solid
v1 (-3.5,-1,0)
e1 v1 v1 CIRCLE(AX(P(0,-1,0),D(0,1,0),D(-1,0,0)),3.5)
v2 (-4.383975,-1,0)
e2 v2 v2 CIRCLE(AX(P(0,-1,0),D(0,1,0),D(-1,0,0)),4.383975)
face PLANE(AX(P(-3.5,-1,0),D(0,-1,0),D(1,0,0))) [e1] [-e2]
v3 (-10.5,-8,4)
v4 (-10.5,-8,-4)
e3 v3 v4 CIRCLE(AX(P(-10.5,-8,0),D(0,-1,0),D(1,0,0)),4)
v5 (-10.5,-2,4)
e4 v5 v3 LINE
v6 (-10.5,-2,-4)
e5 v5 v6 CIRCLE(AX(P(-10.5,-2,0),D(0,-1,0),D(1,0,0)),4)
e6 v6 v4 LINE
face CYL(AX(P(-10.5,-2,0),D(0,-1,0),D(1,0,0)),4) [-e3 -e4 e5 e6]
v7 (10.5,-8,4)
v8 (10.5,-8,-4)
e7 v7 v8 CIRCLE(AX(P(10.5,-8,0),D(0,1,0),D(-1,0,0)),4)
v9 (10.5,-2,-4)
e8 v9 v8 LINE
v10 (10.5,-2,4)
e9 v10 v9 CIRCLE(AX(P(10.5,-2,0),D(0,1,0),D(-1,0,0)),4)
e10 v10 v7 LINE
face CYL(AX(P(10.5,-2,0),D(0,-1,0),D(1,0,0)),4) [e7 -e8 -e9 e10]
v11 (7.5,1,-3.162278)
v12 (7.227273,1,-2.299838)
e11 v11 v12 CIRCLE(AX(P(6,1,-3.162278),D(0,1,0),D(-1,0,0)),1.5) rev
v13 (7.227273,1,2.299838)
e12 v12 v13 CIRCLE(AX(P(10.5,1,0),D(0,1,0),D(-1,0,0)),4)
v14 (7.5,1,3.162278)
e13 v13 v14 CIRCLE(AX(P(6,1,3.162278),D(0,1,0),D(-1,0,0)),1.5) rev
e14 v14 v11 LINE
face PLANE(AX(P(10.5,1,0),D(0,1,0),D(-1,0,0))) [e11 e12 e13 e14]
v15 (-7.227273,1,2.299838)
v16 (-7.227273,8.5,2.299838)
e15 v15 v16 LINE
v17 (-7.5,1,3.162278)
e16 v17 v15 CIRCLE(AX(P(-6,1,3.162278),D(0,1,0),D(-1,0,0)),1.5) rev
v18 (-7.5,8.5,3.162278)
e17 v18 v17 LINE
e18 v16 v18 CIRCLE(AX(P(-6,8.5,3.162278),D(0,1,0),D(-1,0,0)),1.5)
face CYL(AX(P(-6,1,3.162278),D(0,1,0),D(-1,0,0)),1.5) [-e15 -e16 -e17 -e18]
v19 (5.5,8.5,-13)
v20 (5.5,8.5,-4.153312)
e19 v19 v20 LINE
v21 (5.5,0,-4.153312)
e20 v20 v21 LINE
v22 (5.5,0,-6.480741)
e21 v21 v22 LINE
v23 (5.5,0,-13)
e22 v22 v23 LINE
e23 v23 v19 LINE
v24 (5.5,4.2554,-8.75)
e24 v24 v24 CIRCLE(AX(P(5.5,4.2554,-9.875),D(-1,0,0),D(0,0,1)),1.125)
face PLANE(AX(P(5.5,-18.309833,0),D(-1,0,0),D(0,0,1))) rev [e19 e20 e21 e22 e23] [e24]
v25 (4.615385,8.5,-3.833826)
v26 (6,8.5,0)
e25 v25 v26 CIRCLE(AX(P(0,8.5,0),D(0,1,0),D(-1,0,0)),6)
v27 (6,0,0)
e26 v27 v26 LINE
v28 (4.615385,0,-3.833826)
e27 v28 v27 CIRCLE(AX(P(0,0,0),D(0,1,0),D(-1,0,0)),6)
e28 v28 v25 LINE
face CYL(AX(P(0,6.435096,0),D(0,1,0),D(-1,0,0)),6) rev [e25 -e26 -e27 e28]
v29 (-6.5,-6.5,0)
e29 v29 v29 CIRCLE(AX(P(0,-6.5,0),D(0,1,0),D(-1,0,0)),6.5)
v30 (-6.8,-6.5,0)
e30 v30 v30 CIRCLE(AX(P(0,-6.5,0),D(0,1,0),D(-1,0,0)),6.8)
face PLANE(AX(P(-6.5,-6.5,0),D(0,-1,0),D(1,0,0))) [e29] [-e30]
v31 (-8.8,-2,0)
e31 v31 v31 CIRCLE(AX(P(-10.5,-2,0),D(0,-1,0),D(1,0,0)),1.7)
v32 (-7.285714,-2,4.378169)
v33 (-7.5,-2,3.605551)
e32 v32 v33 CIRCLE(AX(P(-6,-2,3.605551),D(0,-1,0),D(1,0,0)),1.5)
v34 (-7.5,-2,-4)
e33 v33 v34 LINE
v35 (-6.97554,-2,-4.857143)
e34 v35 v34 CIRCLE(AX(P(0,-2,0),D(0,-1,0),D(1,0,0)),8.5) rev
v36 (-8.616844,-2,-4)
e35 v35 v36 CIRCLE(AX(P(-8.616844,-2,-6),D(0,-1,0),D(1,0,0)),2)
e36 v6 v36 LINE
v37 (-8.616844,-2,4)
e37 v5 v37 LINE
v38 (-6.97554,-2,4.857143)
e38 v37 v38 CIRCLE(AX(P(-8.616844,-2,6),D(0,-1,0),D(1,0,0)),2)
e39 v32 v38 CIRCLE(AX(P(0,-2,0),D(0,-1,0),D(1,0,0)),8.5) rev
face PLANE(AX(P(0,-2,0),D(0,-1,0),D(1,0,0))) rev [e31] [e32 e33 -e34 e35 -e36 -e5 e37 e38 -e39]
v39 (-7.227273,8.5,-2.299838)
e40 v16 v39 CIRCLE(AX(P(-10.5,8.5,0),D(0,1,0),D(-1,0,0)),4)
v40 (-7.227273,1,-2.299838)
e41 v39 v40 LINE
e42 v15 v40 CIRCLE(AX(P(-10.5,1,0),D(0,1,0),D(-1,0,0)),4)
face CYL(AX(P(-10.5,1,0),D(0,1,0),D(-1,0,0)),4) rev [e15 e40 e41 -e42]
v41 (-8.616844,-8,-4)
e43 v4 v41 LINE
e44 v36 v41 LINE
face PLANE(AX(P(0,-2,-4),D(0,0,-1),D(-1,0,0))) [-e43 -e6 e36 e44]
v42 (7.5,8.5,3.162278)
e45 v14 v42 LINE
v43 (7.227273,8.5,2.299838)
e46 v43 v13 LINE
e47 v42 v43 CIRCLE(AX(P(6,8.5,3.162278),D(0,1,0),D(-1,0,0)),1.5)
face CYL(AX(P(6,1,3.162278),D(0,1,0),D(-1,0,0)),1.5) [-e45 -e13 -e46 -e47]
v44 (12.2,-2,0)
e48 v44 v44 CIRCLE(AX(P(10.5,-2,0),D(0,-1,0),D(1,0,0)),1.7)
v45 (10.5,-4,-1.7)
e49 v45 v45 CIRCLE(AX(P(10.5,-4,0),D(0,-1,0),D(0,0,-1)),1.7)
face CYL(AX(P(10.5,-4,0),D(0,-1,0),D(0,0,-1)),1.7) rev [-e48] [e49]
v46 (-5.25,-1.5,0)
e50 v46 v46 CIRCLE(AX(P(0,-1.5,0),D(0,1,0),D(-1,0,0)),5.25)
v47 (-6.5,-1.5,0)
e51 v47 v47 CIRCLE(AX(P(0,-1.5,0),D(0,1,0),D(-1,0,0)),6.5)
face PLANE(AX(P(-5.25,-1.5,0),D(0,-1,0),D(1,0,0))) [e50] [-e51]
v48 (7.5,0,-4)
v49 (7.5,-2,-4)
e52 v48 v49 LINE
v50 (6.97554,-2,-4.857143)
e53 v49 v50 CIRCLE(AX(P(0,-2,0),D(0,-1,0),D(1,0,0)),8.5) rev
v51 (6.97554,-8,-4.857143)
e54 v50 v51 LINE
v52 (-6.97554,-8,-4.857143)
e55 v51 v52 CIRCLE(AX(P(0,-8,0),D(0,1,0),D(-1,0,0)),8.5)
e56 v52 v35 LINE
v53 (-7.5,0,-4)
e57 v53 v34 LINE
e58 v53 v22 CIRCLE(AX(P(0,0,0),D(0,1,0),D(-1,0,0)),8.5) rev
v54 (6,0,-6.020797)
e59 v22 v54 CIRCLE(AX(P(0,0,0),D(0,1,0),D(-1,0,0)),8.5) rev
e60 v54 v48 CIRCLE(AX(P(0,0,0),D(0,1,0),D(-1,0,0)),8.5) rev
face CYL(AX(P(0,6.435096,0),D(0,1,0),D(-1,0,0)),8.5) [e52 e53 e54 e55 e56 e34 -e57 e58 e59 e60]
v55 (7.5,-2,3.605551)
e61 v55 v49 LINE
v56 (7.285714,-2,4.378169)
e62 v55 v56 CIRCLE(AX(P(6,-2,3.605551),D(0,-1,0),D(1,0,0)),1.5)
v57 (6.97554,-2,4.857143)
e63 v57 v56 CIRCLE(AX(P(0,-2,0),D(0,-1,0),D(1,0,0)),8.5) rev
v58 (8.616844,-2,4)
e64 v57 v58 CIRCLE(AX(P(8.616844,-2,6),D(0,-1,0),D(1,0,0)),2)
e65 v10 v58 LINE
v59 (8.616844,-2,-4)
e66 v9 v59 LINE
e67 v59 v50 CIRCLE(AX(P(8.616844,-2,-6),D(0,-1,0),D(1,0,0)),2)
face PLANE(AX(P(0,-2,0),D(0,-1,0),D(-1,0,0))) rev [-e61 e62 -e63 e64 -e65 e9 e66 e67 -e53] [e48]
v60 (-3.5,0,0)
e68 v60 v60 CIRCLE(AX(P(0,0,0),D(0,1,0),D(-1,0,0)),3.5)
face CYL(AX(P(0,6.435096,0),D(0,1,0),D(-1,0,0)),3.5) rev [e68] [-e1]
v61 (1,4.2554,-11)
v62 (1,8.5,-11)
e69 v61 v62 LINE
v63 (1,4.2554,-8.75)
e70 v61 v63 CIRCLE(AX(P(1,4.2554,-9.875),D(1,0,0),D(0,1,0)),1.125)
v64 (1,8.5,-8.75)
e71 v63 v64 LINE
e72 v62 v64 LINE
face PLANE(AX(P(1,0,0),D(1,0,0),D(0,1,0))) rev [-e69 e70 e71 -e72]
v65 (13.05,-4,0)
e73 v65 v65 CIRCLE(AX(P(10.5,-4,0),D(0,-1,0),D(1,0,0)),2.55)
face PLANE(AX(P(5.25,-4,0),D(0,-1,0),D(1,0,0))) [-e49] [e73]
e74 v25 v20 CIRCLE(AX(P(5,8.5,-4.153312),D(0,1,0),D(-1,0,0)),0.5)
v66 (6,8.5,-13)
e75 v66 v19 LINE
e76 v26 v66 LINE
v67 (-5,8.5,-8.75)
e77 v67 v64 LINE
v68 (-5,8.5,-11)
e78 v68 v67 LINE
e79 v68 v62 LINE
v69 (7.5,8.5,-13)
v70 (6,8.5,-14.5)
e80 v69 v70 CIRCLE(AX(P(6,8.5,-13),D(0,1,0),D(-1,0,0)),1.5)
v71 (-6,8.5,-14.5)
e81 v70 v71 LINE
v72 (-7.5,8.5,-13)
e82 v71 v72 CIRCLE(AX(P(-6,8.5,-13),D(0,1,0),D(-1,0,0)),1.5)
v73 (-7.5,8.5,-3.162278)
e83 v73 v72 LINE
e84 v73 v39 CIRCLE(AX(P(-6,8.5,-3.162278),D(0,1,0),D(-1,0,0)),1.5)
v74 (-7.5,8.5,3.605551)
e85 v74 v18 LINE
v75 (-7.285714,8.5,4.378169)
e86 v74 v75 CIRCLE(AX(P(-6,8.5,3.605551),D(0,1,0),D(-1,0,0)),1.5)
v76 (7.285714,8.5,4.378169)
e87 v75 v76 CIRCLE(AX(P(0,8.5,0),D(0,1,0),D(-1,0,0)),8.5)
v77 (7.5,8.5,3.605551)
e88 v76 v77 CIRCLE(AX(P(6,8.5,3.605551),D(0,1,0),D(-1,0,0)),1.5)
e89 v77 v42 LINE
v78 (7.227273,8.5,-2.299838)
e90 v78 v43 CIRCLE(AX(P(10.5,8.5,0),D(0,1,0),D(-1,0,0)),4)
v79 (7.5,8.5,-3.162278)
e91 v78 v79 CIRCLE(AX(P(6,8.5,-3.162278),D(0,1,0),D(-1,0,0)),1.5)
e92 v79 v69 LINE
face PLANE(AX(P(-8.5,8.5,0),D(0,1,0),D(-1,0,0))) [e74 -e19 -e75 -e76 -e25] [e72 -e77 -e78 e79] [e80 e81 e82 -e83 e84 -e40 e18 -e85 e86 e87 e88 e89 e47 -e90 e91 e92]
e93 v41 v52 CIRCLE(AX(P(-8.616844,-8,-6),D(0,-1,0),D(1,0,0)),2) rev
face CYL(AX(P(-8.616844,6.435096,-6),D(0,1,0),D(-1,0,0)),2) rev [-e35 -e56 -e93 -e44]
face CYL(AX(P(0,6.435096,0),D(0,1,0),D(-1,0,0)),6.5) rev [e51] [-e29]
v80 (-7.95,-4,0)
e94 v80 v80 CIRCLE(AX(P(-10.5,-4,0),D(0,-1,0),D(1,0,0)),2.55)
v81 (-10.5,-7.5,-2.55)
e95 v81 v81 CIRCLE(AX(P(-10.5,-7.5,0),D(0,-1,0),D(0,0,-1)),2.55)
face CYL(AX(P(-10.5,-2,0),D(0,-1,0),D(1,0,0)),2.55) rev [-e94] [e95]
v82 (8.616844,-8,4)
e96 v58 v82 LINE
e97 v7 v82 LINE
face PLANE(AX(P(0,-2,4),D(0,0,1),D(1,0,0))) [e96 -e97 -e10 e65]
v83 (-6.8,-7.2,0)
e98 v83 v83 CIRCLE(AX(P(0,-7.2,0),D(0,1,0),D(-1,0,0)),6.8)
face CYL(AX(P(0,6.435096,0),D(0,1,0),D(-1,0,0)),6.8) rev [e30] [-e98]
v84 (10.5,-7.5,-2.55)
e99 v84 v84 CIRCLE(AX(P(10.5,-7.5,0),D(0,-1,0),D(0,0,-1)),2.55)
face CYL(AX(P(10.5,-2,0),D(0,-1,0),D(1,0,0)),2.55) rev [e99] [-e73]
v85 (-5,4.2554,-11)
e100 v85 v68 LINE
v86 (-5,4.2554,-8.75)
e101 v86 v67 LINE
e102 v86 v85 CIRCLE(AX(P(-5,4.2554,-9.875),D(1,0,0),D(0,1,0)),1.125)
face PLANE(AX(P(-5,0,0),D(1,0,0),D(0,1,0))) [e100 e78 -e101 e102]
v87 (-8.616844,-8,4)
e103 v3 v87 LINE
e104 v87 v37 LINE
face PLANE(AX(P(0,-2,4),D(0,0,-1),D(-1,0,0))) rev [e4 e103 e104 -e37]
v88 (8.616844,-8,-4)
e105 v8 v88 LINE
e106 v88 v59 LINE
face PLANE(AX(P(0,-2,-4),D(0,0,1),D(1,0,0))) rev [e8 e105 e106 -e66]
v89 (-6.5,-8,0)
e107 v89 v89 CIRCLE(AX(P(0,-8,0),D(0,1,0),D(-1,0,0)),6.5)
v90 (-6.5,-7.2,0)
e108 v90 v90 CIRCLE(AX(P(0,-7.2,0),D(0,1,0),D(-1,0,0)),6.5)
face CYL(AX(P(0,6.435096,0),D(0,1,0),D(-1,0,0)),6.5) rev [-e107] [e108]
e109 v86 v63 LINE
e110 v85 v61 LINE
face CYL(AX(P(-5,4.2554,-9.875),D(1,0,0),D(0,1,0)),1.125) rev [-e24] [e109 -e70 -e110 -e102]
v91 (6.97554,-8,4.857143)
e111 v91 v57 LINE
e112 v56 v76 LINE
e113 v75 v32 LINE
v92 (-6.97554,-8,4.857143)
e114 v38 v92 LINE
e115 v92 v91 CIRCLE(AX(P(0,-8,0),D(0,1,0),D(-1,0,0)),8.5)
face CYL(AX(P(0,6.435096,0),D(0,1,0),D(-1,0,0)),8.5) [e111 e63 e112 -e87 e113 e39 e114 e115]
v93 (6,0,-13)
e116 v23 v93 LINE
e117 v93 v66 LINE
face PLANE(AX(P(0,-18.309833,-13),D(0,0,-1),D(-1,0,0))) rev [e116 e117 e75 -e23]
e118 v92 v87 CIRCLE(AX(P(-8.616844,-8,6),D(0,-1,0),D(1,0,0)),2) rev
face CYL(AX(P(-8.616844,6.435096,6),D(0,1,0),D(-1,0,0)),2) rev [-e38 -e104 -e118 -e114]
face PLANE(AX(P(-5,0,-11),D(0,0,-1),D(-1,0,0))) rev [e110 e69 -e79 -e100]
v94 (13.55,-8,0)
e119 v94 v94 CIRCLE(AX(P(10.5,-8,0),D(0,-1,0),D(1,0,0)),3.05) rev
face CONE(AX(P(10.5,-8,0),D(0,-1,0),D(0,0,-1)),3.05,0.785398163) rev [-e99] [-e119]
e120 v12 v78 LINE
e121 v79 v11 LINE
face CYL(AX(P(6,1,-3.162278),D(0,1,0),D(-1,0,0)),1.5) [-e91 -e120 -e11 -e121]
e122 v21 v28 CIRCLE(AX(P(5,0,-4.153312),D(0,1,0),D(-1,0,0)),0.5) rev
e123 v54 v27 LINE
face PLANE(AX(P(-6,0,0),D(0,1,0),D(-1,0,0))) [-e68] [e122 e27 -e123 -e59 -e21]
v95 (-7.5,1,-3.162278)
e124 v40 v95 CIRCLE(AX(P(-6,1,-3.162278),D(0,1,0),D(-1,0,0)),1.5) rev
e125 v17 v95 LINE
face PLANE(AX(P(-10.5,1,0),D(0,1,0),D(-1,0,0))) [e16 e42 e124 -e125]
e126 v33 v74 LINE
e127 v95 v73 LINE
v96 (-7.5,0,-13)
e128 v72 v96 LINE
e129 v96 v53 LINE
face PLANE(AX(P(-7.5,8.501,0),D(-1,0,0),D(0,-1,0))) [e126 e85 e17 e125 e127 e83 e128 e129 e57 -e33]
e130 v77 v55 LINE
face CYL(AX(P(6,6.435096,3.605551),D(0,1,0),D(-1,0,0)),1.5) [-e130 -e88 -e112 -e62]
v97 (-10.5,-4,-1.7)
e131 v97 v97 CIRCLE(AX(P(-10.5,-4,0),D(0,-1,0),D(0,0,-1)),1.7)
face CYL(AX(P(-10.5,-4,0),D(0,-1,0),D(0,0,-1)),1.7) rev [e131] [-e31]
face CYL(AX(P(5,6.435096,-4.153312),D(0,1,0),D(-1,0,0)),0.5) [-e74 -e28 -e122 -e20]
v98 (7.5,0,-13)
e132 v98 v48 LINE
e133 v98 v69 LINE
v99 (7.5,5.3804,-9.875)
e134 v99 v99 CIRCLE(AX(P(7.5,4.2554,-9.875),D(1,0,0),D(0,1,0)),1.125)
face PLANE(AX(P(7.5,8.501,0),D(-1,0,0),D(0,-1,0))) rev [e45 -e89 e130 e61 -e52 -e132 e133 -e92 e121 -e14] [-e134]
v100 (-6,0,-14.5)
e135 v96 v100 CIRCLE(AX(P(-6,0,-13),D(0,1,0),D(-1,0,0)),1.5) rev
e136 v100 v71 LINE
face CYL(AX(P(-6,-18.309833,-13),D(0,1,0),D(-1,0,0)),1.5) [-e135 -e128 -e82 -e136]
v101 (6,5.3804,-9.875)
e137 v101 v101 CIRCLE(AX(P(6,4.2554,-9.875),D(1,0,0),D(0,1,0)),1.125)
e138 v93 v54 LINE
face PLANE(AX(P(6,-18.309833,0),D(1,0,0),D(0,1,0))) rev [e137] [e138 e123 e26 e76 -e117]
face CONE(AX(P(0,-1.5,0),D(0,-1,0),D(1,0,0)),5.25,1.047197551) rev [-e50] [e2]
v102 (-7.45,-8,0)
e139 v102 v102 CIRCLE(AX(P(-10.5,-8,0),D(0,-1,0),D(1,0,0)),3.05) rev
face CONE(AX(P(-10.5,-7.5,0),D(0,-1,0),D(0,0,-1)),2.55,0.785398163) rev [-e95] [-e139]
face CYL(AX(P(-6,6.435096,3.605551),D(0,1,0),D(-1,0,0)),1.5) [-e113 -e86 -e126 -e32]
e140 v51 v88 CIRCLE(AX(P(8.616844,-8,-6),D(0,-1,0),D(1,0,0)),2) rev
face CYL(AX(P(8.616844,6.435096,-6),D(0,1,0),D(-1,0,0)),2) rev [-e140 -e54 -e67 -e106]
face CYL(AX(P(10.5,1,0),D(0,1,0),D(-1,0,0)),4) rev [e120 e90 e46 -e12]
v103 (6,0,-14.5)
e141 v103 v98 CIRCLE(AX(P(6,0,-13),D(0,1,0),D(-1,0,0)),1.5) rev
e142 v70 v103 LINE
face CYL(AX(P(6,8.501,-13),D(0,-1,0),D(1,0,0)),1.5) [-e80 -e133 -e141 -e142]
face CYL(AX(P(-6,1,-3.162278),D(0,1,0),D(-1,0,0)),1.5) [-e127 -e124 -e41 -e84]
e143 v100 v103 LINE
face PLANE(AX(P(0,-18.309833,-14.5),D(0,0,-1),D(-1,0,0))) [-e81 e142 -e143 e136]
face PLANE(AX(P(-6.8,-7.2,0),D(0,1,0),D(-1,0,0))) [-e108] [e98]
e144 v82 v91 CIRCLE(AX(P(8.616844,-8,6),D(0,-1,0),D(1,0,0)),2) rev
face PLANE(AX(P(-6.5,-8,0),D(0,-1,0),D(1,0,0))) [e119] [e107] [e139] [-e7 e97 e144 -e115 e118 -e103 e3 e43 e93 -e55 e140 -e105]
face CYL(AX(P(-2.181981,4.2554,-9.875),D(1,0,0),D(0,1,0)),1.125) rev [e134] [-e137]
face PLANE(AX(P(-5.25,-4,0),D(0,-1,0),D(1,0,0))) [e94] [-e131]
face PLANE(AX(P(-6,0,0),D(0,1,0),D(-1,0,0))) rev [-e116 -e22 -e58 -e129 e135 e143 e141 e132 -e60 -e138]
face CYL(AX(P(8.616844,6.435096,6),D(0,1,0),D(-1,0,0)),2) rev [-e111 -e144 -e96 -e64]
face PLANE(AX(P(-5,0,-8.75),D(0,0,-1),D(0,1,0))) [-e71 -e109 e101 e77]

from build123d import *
from build123d.topology import SkipClean

# Parameters (mm, degrees)
BOSS_EXTRU_1_START      = -6
BOSS_EXTRU_1_DEPTH      = 6
BOSS_EXTRU_2_START      = -6
BOSS_EXTRU_2_DEPTH      = 2
ENL_V_START             = -4
ESQUISSE3_5_R           = 2.55
ENL_V_MAT_EXTRU_1_DEPTH = 4
ENL_V_START_2           = -16.5
ENL_V_MAT_EXTRU_5_DEPTH = 10.5
CONG_1_R                = 2
CHANFREIN1_SIZE         = 0.5
SYM_TRIE1_START         = -2
SYM_TRIE1_DEPTH         = 10.5
SYM_TRIE1_START_2       = -8
SYM_TRIE1_2_DEPTH       = 4
SYM_TRIE1_START_3       = -7.5000001
SYM_TRIE1_3_DEPTH       = 5.5000001
SYM_TRIE1_START_4       = -4
SYM_TRIE1_4_DEPTH       = 2
SYM_TRIE1_7_DEPTH       = 0.4999999
M3_CLEARANCE_HOLE1_D    = 3.4
BOSS_EXTRU_3_DEPTH      = 8.5
ENL_V_START_3           = -8.5
ENL_V_MAT_EXTRU_2_DEPTH = 8.5
ENL_V_START_4           = -6.5
ESQUISSE5_R             = 1.125
ENL_V_MAT_EXTRU_3_DEPTH = 6
ESQUISSE5_3_R           = 1.125
ENL_V_MAT_EXTRU_4_DEPTH = 6.5
CONG_2_R                = 0.5
CONG_3_R                = 1.5
ENL_V_START_5           = -7.5
ESQUISSE9_R             = 4
ENL_V_MAT_EXTRU_8_DEPTH = 7.5
CONG_5_R                = 1.5


with BuildPart() as part:
    # Esquisse1 → Révolution1 (revolve)
    with BuildSketch(Plane.XY):
        Polygon((-8.5, 8.5), (-6, 8.5), (-6, 0), (-3.5, 0), (-3.5, -1), (-4.383974596, -1), (-5.25, -1.5), (-6.5, -1.5), (-6.5, -6.5), (-6.8, -6.5), (-6.8, -7.2), (-6.5, -7.2), (-6.5, -8), (-8.5, -8), align=None)
    revolve(axis=Axis((0, 6.43509573, 0), (0, -1, 0)))

    # Esquisse3 → Boss.-Extru.1 (add)
    with BuildSketch(Plane.XZ.offset(8).offset(BOSS_EXTRU_1_START)):
        with BuildLine():
            ThreePointArc((-7.928571429, 3.06394437), (-7.728470361, 3.5384666), (-7.5, 4))
            Line((-7.5, 4), (-10.5, 4))
            ThreePointArc((-10.5, 4), (-14.5, 0), (-10.5, -4))
            Line((-10.5, -4), (-7.5, -4))
            ThreePointArc((-7.5, -4), (-7.728470361, -3.5384666), (-7.928571429, -3.06394437))
            ThreePointArc((-7.928571429, -3.06394437), (-8.196108254, -2.252511816), (-8.380833333, -1.418320358))
            ThreePointArc((-8.380833333, -1.418320358), (-13.05, 0), (-8.380833333, 1.418320358))
            ThreePointArc((-8.380833333, 1.418320358), (-8.196108254, 2.252511816), (-7.928571429, 3.06394437))
        make_face()
    extrude(amount=BOSS_EXTRU_1_DEPTH)

    # Esquisse3<4> → Boss.-Extru.2 (add)
    with BuildSketch(Plane.XZ.offset(8).offset(BOSS_EXTRU_2_START)):
        with BuildLine():
            ThreePointArc((-8.380833333, -1.418320358), (-8.5, 0), (-8.380833333, 1.418320358))
            ThreePointArc((-8.380833333, 1.418320358), (-13.05, 0), (-8.380833333, -1.418320358))
        make_face()
    extrude(amount=BOSS_EXTRU_2_DEPTH)

    # Esquisse3<5> → Enlèv. mat.-Extru.1 (cut)
    with BuildSketch(Plane.XZ.offset(8).offset(ENL_V_START)):
        with Locations((-10.5, 0)):
            Circle(ESQUISSE3_5_R)
    extrude(amount=ENL_V_MAT_EXTRU_1_DEPTH, mode=Mode.SUBTRACT)

    # Esquisse3<7> → Enlèv. mat.-Extru.5 (cut)
    with BuildSketch(Plane.XZ.offset(8).offset(ENL_V_START_2)):
        with BuildLine():
            ThreePointArc((-7.5, 4), (-8.5, 0), (-7.5, -4))
            Line((-7.5, -4), (-7.5, 4))
        make_face()
    extrude(amount=ENL_V_MAT_EXTRU_5_DEPTH, mode=Mode.SUBTRACT)

    # Congé1
    cong_1_edges = [part.edges().sort_by_distance(p)[0] for p in [
        (-7.5, -5, 4),
        (-7.5, -5, -4),
    ]]
    fillet(cong_1_edges, radius=CONG_1_R)

    # Chanfrein1
    chanfrein1_edges = [part.edges().sort_by_distance(p)[0] for p in [
        (-8.06008453, -8, 0.741156191),
    ]]
    chamfer(chanfrein1_edges, length=CHANFREIN1_SIZE)

    # Symétrie1: read off the stored shape, not the designer's step
    # Symétrie1 outline → Symétrie1 (cut)
    with BuildSketch(Plane(origin=(0, 0, 0), x_dir=(1, 0, 0), z_dir=(0, 1, 0)).offset(SYM_TRIE1_START)):
        with BuildLine():
            Line((7.5, 4), (7.5, -4))
            ThreePointArc((7.5, -4), (8.5, 0), (7.5, 4))
        make_face()
    extrude(amount=SYM_TRIE1_DEPTH, mode=Mode.SUBTRACT)

    # Sym_trie1 2 outline → Sym_trie1 2 (cut)
    with BuildSketch(Plane(origin=(0, 0, 0), x_dir=(1, 0, 0), z_dir=(0, 1, 0)).offset(SYM_TRIE1_START_2)):
        with BuildLine():
            ThreePointArc((8.380833333, 1.418320358), (7.95, 0), (8.380833333, -1.418320358))
            ThreePointArc((8.380833333, -1.418320358), (8.5, 0), (8.380833333, 1.418320358))
        make_face()
    extrude(amount=SYM_TRIE1_2_DEPTH, mode=Mode.SUBTRACT)

    # Sym_trie1 3 outline → Sym_trie1 3 (add)
    with BuildSketch(Plane(origin=(0, 0, 0), x_dir=(1, 0, 0), z_dir=(0, 1, 0)).offset(SYM_TRIE1_START_3)):
        with BuildLine():
            ThreePointArc((6.975540357, -4.857142857), (7.69102387, -4.227189479), (8.61684397, -4))
            Line((8.61684397, -4), (10.5, -4))
            ThreePointArc((10.5, -4), (14.5, 0), (10.5, 4))
            Line((10.5, 4), (8.61684397, 4))
            ThreePointArc((8.61684397, 4), (7.69102387, 4.227189479), (6.975540357, 4.857142857))
            ThreePointArc((6.975540357, 4.857142857), (7.868349781, 3.215442696), (8.380833333, 1.418320358))
            ThreePointArc((8.380833333, 1.418320358), (13.05, 0), (8.380833333, -1.418320358))
            ThreePointArc((8.380833333, -1.418320358), (7.868349781, -3.215442696), (6.975540357, -4.857142857))
        make_face()
    extrude(amount=SYM_TRIE1_3_DEPTH)

    # Sym_trie1 4 outline → Sym_trie1 4 (add)
    with BuildSketch(Plane(origin=(0, 0, 0), x_dir=(1, 0, 0), z_dir=(0, 1, 0)).offset(SYM_TRIE1_START_4)):
        with BuildLine():
            ThreePointArc((8.380833333, 1.418320358), (8.5, 0), (8.380833333, -1.418320358))
            ThreePointArc((8.380833333, -1.418320358), (13.05, 0), (8.380833333, 1.418320358))
        make_face()
    extrude(amount=SYM_TRIE1_4_DEPTH)

    # Sym_trie1 5 outline → Sym_trie1 5 (revolve, cut)
    with BuildSketch(Plane(origin=(10.5, 0, 0), x_dir=(1, 0, 0), z_dir=(0, 0, 1))):
        Polygon((3.05, -8), (2.55, -7.5), (2.55, -8), align=None)
    revolve(axis=Axis((10.5, 0, 0), (0, 1, 0)), mode=Mode.SUBTRACT)

    # Sym_trie1 6 outline → Sym_trie1 6 (revolve)
    with SkipClean():  # the faces are left unmerged after this step: merging them gives an invalid solid
        with BuildSketch(Plane(origin=(10.5, 0, 0), x_dir=(1, 0, 0), z_dir=(0, 0, 1))):
            Polygon((3.05, -7.5), (2.55, -7.5), (3.05, -8), align=None)
        revolve(axis=Axis((10.5, 0, 0), (0, 1, 0)))

    # Sym_trie1 7 outline → Sym_trie1 7 (add)
    with BuildSketch(Plane(origin=(0, 0, 0), x_dir=(1, 0, 0), z_dir=(0, 1, 0)).offset(SYM_TRIE1_START_2)):
        with BuildLine():
            ThreePointArc((8.2475, 2.056390953), (13.55, 0), (8.2475, -2.056390953))
            ThreePointArc((8.2475, -2.056390953), (7.933495012, -3.051173035), (7.5, -4))
            ThreePointArc((7.5, -4), (7.250447615, -4.436328367), (6.975540357, -4.857142857))
            ThreePointArc((6.975540357, -4.857142857), (7.69102387, -4.227189479), (8.61684397, -4))
            Line((8.61684397, -4), (10.5, -4))
            ThreePointArc((10.5, -4), (14.5, 0), (10.5, 4))
            Line((10.5, 4), (8.61684397, 4))
            ThreePointArc((8.61684397, 4), (7.69102387, 4.227189479), (6.975540357, 4.857142857))
            ThreePointArc((6.975540357, 4.857142857), (7.250447615, 4.436328367), (7.5, 4))
            ThreePointArc((7.5, 4), (7.933495012, 3.051173035), (8.2475, 2.056390953))
        make_face()
    extrude(amount=SYM_TRIE1_7_DEPTH)

    # M3 Clearance Hole1 (through all)
    with Locations(Plane(origin=(0, -4, 0), x_dir=(-1, 0, 0), z_dir=(0, -1, 0))):
        with Locations((10.5, 0), (-10.5, 0)):
            Hole(M3_CLEARANCE_HOLE1_D / 2)

    # Esquisse4 → Boss.-Extru.3 (add)
    with BuildSketch(Plane(origin=(0, 8.5, 0), x_dir=(1, 0, 0), z_dir=(0, 1, 0))):
        with BuildLine():
            Line((7.5, 14.5), (-7.5, 14.5))
            Line((-7.5, 14.5), (-7.5, 4))
            ThreePointArc((-7.5, 4), (-1.593272922, 8.349340177), (5.5, 6.480740698))
            Line((5.5, 6.480740698), (5.5, 13))
            Line((5.5, 13), (6, 13))
            Line((6, 13), (6, 6.020797289))
            ThreePointArc((6, 6.020797289), (6.825203691, 5.066220937), (7.5, 4))
            Line((7.5, 4), (7.5, 14.5))
        make_face()
    extrude(amount=-BOSS_EXTRU_3_DEPTH)

    # Esquisse4<3> → Enlèv. mat.-Extru.2 (cut)
    with BuildSketch(Plane(origin=(0, 8.5, 0), x_dir=(1, 0, 0), z_dir=(0, 1, 0)).offset(ENL_V_START_3)):
        with BuildLine():
            Line((6, 0), (6, 13))
            Line((6, 13), (5.5, 13))
            Line((5.5, 13), (5.5, 2.397915762))
            ThreePointArc((5.5, 2.397915762), (5.873670062, 1.224744871), (6, 0))
        make_face()
    extrude(amount=ENL_V_MAT_EXTRU_2_DEPTH, mode=Mode.SUBTRACT)

    # Esquisse5 → Enlèv. mat.-Extru.3 (cut)
    with BuildSketch(Plane(origin=(7.5, 0, 0), x_dir=(0, 0, -1), z_dir=(1, 0, 0)).offset(ENL_V_START_4)):
        with Locations((9.875, 4.2554)):
            Circle(ESQUISSE5_R)
        with BuildLine():
            Line((8.75, 8.5), (8.75, 4.2554))
            ThreePointArc((8.75, 4.2554), (9.875, 5.3804), (11, 4.2554))
            Line((11, 4.2554), (11, 8.5))
            Line((11, 8.5), (8.75, 8.5))
        make_face()
    extrude(amount=-ENL_V_MAT_EXTRU_3_DEPTH, mode=Mode.SUBTRACT)

    # Esquisse5<3> → Enlèv. mat.-Extru.4 (cut)
    with BuildSketch(Plane(origin=(7.5, 0, 0), x_dir=(0, 0, -1), z_dir=(1, 0, 0))):
        with Locations(Location((9.875, 4.2554, 0), (0, 0, 180))):
            Circle(ESQUISSE5_3_R)
    extrude(amount=-ENL_V_MAT_EXTRU_4_DEPTH, mode=Mode.SUBTRACT)

    # Congé2
    # the kernel refuses this fillet: 0.5 mm, written as the material it takes off along each edge
    with BuildSketch(Plane(origin=(5.5, 0, -2.397915762), x_dir=(0, 0, -1), z_dir=(0, 1, 0))) as cong_2_piece_1:
        with BuildLine():
            CenterArc((1.75539617, 0.5), CONG_2_R, 129.715137232, 140.284862768)
            ThreePointArc((1.435910637, 0.884615385), (0.749192225, 0.391603841), (0, 0))
            Line((0, 0), (1.75539617, 0))
        make_face()
    extrude(amount=12.888490425, mode=Mode.SUBTRACT)

    # Congé3
    cong_3_edges = [part.edges().sort_by_distance(p)[0] for p in [
        (7.5, 3.25, 4),
        (7.5, 4.25, -14.5),
        (-7.5, 4.25, -14.5),
        (-7.5, 3.25, 4),
    ]]
    fillet(cong_3_edges, radius=CONG_3_R)

    # Esquisse9 → Enlèv. mat.-Extru.8 (cut)
    with BuildSketch(Plane(origin=(0, 8.5, 0), x_dir=(1, 0, 0), z_dir=(0, 1, 0)).offset(ENL_V_START_5)):
        with Locations((-10.5, 0)):
            Circle(ESQUISSE9_R)
        with Locations((10.5, 0)):
            Circle(ESQUISSE9_R)
    extrude(amount=ENL_V_MAT_EXTRU_8_DEPTH, mode=Mode.SUBTRACT)

    # Congé5
    cong_5_edges = [part.edges().sort_by_distance(p)[0] for p in [
        (7.5, 4.75, -2.645751311),
        (7.5, 4.75, 2.645751311),
        (-7.5, 4.75, -2.645751311),
        (-7.5, 4.75, 2.645751311),
    ]]
    fillet(cong_5_edges, radius=CONG_5_R)


solid = part.part
